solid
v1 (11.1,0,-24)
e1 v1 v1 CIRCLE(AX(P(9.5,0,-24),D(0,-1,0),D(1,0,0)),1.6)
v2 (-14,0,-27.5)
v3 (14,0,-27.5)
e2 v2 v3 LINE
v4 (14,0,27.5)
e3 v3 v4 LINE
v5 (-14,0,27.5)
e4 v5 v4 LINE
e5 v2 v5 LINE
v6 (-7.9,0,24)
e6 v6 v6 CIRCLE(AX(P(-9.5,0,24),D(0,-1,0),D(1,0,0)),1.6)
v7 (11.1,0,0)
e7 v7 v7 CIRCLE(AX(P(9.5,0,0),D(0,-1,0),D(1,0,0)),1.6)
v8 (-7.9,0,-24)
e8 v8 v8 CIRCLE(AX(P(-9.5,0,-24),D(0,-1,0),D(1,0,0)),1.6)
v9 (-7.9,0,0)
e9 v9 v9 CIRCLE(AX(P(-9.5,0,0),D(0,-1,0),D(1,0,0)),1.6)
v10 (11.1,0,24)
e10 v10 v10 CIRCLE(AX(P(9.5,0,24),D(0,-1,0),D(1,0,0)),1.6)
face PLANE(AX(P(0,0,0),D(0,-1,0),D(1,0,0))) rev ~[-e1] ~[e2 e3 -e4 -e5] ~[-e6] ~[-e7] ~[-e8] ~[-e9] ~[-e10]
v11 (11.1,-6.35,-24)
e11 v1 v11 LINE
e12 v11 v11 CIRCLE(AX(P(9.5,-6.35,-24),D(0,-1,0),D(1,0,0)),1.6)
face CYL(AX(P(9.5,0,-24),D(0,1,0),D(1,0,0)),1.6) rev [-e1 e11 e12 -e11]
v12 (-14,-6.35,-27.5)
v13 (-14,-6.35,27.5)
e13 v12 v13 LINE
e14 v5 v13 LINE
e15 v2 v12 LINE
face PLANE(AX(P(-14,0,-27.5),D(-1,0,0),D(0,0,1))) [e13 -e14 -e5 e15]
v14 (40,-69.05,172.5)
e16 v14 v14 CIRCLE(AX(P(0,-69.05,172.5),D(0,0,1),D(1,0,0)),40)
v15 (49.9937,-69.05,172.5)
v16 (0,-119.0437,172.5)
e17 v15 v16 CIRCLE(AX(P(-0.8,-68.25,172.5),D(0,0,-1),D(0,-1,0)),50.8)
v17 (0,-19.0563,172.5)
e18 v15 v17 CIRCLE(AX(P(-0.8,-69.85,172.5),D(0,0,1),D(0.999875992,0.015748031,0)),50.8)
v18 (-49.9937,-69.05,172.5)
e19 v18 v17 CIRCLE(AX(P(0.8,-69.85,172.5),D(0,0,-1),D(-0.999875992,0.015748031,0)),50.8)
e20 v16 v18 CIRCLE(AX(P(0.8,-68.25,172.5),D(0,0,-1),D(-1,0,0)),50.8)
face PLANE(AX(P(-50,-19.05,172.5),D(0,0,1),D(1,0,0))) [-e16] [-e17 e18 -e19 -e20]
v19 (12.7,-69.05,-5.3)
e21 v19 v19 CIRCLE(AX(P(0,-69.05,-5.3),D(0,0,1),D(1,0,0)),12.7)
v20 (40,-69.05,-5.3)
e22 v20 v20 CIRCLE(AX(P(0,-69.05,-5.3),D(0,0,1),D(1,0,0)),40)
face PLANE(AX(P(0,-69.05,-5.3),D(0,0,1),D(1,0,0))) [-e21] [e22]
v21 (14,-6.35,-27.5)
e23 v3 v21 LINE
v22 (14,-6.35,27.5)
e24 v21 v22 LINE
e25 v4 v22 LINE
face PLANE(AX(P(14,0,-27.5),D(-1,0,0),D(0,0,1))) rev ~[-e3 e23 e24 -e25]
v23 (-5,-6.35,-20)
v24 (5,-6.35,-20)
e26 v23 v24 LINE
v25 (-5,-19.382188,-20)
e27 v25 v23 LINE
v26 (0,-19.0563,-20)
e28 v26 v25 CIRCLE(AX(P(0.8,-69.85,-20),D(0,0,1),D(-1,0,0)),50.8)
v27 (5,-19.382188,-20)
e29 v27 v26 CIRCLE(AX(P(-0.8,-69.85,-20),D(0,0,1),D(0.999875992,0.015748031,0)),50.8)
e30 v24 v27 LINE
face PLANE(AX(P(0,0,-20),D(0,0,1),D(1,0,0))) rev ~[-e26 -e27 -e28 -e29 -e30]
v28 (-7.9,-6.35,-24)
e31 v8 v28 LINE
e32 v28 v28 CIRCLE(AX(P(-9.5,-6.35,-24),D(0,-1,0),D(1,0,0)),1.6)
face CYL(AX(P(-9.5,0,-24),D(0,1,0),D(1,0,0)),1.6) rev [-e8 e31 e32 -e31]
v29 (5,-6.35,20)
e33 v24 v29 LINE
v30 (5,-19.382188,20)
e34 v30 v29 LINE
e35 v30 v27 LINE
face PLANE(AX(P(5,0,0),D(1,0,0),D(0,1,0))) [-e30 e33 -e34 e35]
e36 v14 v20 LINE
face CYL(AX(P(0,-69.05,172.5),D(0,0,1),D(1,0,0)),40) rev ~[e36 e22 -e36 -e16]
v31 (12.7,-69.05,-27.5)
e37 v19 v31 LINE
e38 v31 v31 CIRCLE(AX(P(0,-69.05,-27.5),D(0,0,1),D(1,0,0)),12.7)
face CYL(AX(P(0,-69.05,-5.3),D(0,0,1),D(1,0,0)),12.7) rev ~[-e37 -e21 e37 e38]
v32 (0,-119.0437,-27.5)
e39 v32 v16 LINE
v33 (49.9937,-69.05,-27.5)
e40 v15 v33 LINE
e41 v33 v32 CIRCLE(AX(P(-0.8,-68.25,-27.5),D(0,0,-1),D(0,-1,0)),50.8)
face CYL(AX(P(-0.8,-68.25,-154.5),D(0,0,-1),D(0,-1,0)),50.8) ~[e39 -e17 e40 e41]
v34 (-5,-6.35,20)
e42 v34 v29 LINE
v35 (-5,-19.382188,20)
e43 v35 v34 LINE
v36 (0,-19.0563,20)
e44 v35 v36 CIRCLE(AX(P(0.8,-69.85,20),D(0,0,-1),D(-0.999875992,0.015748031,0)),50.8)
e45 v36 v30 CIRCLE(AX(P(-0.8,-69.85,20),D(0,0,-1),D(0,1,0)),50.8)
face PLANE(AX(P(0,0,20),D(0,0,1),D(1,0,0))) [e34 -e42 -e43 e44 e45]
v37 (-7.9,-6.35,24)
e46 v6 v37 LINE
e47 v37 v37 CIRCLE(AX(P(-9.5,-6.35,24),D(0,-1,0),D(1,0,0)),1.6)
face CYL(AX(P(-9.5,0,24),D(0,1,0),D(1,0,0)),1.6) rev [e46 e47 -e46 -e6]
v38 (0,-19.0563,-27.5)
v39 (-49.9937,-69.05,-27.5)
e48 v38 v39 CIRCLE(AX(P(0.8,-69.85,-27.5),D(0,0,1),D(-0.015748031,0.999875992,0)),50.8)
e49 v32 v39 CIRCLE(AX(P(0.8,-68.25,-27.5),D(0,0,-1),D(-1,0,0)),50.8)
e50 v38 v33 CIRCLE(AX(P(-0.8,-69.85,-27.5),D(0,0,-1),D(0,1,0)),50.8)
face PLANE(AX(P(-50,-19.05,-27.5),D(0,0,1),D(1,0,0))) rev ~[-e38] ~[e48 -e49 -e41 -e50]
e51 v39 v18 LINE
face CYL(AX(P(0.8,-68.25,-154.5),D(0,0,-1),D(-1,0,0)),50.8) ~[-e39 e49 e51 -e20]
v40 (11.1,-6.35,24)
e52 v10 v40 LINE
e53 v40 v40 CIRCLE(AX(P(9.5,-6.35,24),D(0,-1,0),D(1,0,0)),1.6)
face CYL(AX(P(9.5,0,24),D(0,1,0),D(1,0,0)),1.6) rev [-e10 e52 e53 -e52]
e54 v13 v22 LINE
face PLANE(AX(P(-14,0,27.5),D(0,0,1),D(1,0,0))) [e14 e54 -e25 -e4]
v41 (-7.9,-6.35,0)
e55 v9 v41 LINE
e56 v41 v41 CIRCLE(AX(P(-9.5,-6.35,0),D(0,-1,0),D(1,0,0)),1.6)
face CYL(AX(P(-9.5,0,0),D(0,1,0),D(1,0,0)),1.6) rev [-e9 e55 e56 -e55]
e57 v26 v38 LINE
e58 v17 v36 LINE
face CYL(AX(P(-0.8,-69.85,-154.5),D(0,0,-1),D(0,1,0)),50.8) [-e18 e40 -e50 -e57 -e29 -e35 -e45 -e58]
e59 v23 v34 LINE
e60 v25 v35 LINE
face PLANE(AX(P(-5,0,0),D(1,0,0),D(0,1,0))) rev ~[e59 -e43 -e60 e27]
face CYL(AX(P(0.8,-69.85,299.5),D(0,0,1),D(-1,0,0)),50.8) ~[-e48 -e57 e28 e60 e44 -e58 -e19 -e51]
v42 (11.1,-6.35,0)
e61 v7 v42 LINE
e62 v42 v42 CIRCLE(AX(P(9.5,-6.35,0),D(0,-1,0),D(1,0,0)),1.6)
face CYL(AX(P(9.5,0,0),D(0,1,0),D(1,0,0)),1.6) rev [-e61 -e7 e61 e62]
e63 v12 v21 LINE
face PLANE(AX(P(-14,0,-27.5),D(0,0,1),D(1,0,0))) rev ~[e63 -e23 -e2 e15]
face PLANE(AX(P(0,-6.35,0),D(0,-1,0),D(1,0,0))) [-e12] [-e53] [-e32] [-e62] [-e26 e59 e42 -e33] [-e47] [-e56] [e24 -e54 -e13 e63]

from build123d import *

# Parameters (mm, degrees)
F0_W          = 28
F0_H          = 55
F0_R          = 1.6
F1_DEPTH      = 6.35
F2_W          = 10
F2_H          = 40
F3_DEPTH      = 12.7
F4_W          = 100
F4_H          = 200
F5_DEPTH      = 100
F6_R          = 40
F7_DEPTH      = 177.8
F8_R          = 12.7
F9_DEPTH      = 41.656
F10_T1_DEPTH  = 454
F10_T6_DEPTH  = 454
F10_T12_DEPTH = 454
F10_T18_DEPTH = 454
F10_T25_DEPTH = 454
F10_T31_DEPTH = 454
F10_T37_DEPTH = 454
F10_T43_DEPTH = 454
F10_T49_DEPTH = 454
F10_T56_DEPTH = 454
F10_T62_DEPTH = 454


# Not quite as in the source:
# - a fillet or chamfer that OpenCascade refuses, or shapes differently, is made with other operations: its cross-section is extruded or revolved along the edge and cut away or added


with BuildPart() as f1:
    # F0 (on Front) → F1 (new body)
    with BuildSketch(Plane.XZ):
        Rectangle(F0_W, F0_H)
        with Locations((-9.5, -24)):
            Circle(F0_R, mode=Mode.SUBTRACT)
        with Locations((9.5, -24)):
            Circle(F0_R, mode=Mode.SUBTRACT)
        with Locations((-9.5, 0)):
            Circle(F0_R, mode=Mode.SUBTRACT)
        with Locations((-9.5, 24)):
            Circle(F0_R, mode=Mode.SUBTRACT)
        with Locations((9.5, 0)):
            Circle(F0_R, mode=Mode.SUBTRACT)
        with Locations((9.5, 24)):
            Circle(F0_R, mode=Mode.SUBTRACT)
    extrude(amount=F1_DEPTH)

    # F2 (on face) → F3 (join)
    with BuildSketch(Plane.XZ.offset(6.35)):
        Rectangle(F2_W, F2_H)
    extrude(amount=F3_DEPTH)

    # F4 (on face) → F5 (join)
    with BuildSketch(Plane.XZ.offset(19.05)):
        with Locations((0, 72.5)):
            Rectangle(F4_W, F4_H)
    extrude(amount=F5_DEPTH)

    # F6 (on face) → F7 (cut)
    with BuildSketch(Plane.XY.offset(172.5)):
        with Locations((0, -69.05)):
            Circle(F6_R)
    extrude(amount=-F7_DEPTH, mode=Mode.SUBTRACT)

    # F8 (on face) → F9 (cut)
    with BuildSketch(Plane.XY.offset(-5.3)):
        with Locations((0, -69.05)):
            Circle(F8_R)
    extrude(amount=-F9_DEPTH, mode=Mode.SUBTRACT)

    # F10: fillet of radius 50.8 on 4 edges, made by hand

    # F10_s2 → F10_t1 (cut)
    with BuildSketch(Plane.XY.offset(-154.5)):
        with BuildLine():
            ThreePointArc((-0.8, -119.05), (35.1210244843, -104.1710244843), (50, -68.25))
            Line((50, -68.25), (50, -119.05))
            Line((50, -119.05), (-0.8, -119.05))
        make_face()
        with BuildLine():
            ThreePointArc((-50, -68.25), (-35.1210244843, -104.1710244843), (0.8, -119.05))
            Line((0.8, -119.05), (-50, -119.05))
            Line((-50, -119.05), (-50, -68.25))
        make_face()
    extrude(amount=F10_T1_DEPTH, mode=Mode.SUBTRACT)


with BuildPart() as f10_tool4:
    # F10_s5 → F10_t6 (new body)
    with BuildSketch(Plane.XY.offset(-154.5)):
        with BuildLine():
            ThreePointArc((-0.8, -19.05), (35.1210244843, -33.9289755157), (50, -69.85))
            Line((50, -69.85), (50, -19.05))
            Line((50, -19.05), (-0.8, -19.05))
        make_face()
    extrude(amount=F10_T6_DEPTH)

    split(bisect_by=Plane.XY.offset(-20), keep=Keep.BOTTOM)

    split(bisect_by=Plane.YZ.offset(5), keep=Keep.BOTTOM)


with BuildPart() as f1_1:
    add(f1.part)

    # F10_t3: cut F10_tool4
    add(f10_tool4.part, mode=Mode.SUBTRACT)


with BuildPart() as f10_tool10:
    # F10_s11 → F10_t12 (new body)
    with BuildSketch(Plane.XY.offset(-154.5)):
        with BuildLine():
            ThreePointArc((-0.8, -19.05), (35.1210244843, -33.9289755157), (50, -69.85))
            Line((50, -69.85), (50, -19.05))
            Line((50, -19.05), (-0.8, -19.05))
        make_face()
    extrude(amount=F10_T12_DEPTH)

    split(bisect_by=Plane.XY.offset(-20), keep=Keep.BOTTOM)

    split(bisect_by=Plane.YZ.offset(5), keep=Keep.TOP)


with BuildPart() as f1_2:
    add(f1_1.part)

    # F10_t9: cut F10_tool10
    add(f10_tool10.part, mode=Mode.SUBTRACT)


with BuildPart() as f10_tool16:
    # F10_s17 → F10_t18 (new body)
    with BuildSketch(Plane.XY.offset(-154.5)):
        with BuildLine():
            ThreePointArc((-0.8, -19.05), (35.1210244843, -33.9289755157), (50, -69.85))
            Line((50, -69.85), (50, -19.05))
            Line((50, -19.05), (-0.8, -19.05))
        make_face()
    extrude(amount=F10_T18_DEPTH)

    split(bisect_by=Plane.XY.offset(20), keep=Keep.BOTTOM)

    split(bisect_by=Plane.XY.offset(-20), keep=Keep.TOP)

    split(bisect_by=Plane.YZ.offset(5), keep=Keep.TOP)


with BuildPart() as f1_3:
    add(f1_2.part)

    # F10_t15: cut F10_tool16
    add(f10_tool16.part, mode=Mode.SUBTRACT)


with BuildPart() as f10_tool23:
    # F10_s24 → F10_t25 (new body)
    with BuildSketch(Plane.XY.offset(-154.5)):
        with BuildLine():
            ThreePointArc((-0.8, -19.05), (35.1210244843, -33.9289755157), (50, -69.85))
            Line((50, -69.85), (50, -19.05))
            Line((50, -19.05), (-0.8, -19.05))
        make_face()
    extrude(amount=F10_T25_DEPTH)

    split(bisect_by=Plane.XY.offset(20), keep=Keep.TOP)

    split(bisect_by=Plane.YZ.offset(5), keep=Keep.BOTTOM)


with BuildPart() as f1_4:
    add(f1_3.part)

    # F10_t22: cut F10_tool23
    add(f10_tool23.part, mode=Mode.SUBTRACT)


with BuildPart() as f10_tool29:
    # F10_s30 → F10_t31 (new body)
    with BuildSketch(Plane.XY.offset(-154.5)):
        with BuildLine():
            ThreePointArc((-0.8, -19.05), (35.1210244843, -33.9289755157), (50, -69.85))
            Line((50, -69.85), (50, -19.05))
            Line((50, -19.05), (-0.8, -19.05))
        make_face()
    extrude(amount=F10_T31_DEPTH)

    split(bisect_by=Plane.XY.offset(20), keep=Keep.TOP)

    split(bisect_by=Plane.YZ.offset(5), keep=Keep.TOP)


with BuildPart() as f1_5:
    add(f1_4.part)

    # F10_t28: cut F10_tool29
    add(f10_tool29.part, mode=Mode.SUBTRACT)


with BuildPart() as f10_tool35:
    # F10_s36 → F10_t37 (new body)
    with BuildSketch(Plane.XY.offset(299.5)):
        with BuildLine():
            ThreePointArc((-50, -69.85), (-35.1210244843, -33.9289755157), (0.8, -19.05))
            Line((0.8, -19.05), (-50, -19.05))
            Line((-50, -19.05), (-50, -69.85))
        make_face()
    extrude(amount=-F10_T37_DEPTH)

    split(bisect_by=Plane.XY.offset(20), keep=Keep.TOP)

    split(bisect_by=Plane.YZ.offset(-5), keep=Keep.BOTTOM)


with BuildPart() as f1_6:
    add(f1_5.part)

    # F10_t34: cut F10_tool35
    add(f10_tool35.part, mode=Mode.SUBTRACT)


with BuildPart() as f10_tool41:
    # F10_s42 → F10_t43 (new body)
    with BuildSketch(Plane.XY.offset(299.5)):
        with BuildLine():
            ThreePointArc((-50, -69.85), (-35.1210244843, -33.9289755157), (0.8, -19.05))
            Line((0.8, -19.05), (-50, -19.05))
            Line((-50, -19.05), (-50, -69.85))
        make_face()
    extrude(amount=-F10_T43_DEPTH)

    split(bisect_by=Plane.XY.offset(20), keep=Keep.TOP)

    split(bisect_by=Plane.YZ.offset(-5), keep=Keep.TOP)


with BuildPart() as f1_7:
    add(f1_6.part)

    # F10_t40: cut F10_tool41
    add(f10_tool41.part, mode=Mode.SUBTRACT)


with BuildPart() as f10_tool47:
    # F10_s48 → F10_t49 (new body)
    with BuildSketch(Plane.XY.offset(299.5)):
        with BuildLine():
            ThreePointArc((-50, -69.85), (-35.1210244843, -33.9289755157), (0.8, -19.05))
            Line((0.8, -19.05), (-50, -19.05))
            Line((-50, -19.05), (-50, -69.85))
        make_face()
    extrude(amount=-F10_T49_DEPTH)

    split(bisect_by=Plane.XY.offset(20), keep=Keep.BOTTOM)

    split(bisect_by=Plane.YZ.offset(-5), keep=Keep.BOTTOM)

    split(bisect_by=Plane.XY.offset(-20), keep=Keep.TOP)


with BuildPart() as f1_8:
    add(f1_7.part)

    # F10_t46: cut F10_tool47
    add(f10_tool47.part, mode=Mode.SUBTRACT)


with BuildPart() as f10_tool54:
    # F10_s55 → F10_t56 (new body)
    with BuildSketch(Plane.XY.offset(299.5)):
        with BuildLine():
            ThreePointArc((-50, -69.85), (-35.1210244843, -33.9289755157), (0.8, -19.05))
            Line((0.8, -19.05), (-50, -19.05))
            Line((-50, -19.05), (-50, -69.85))
        make_face()
    extrude(amount=-F10_T56_DEPTH)

    split(bisect_by=Plane.YZ.offset(-5), keep=Keep.BOTTOM)

    split(bisect_by=Plane.XY.offset(-20), keep=Keep.BOTTOM)


with BuildPart() as f1_9:
    add(f1_8.part)

    # F10_t53: cut F10_tool54
    add(f10_tool54.part, mode=Mode.SUBTRACT)


with BuildPart() as f10_tool60:
    # F10_s61 → F10_t62 (new body)
    with BuildSketch(Plane.XY.offset(299.5)):
        with BuildLine():
            ThreePointArc((-50, -69.85), (-35.1210244843, -33.9289755157), (0.8, -19.05))
            Line((0.8, -19.05), (-50, -19.05))
            Line((-50, -19.05), (-50, -69.85))
        make_face()
    extrude(amount=-F10_T62_DEPTH)

    split(bisect_by=Plane.YZ.offset(-5), keep=Keep.TOP)

    split(bisect_by=Plane.XY.offset(-20), keep=Keep.BOTTOM)


with BuildPart() as f1_10:
    add(f1_9.part)

    # F10_t59: cut F10_tool60
    add(f10_tool60.part, mode=Mode.SUBTRACT)


solid = f1_10.part
